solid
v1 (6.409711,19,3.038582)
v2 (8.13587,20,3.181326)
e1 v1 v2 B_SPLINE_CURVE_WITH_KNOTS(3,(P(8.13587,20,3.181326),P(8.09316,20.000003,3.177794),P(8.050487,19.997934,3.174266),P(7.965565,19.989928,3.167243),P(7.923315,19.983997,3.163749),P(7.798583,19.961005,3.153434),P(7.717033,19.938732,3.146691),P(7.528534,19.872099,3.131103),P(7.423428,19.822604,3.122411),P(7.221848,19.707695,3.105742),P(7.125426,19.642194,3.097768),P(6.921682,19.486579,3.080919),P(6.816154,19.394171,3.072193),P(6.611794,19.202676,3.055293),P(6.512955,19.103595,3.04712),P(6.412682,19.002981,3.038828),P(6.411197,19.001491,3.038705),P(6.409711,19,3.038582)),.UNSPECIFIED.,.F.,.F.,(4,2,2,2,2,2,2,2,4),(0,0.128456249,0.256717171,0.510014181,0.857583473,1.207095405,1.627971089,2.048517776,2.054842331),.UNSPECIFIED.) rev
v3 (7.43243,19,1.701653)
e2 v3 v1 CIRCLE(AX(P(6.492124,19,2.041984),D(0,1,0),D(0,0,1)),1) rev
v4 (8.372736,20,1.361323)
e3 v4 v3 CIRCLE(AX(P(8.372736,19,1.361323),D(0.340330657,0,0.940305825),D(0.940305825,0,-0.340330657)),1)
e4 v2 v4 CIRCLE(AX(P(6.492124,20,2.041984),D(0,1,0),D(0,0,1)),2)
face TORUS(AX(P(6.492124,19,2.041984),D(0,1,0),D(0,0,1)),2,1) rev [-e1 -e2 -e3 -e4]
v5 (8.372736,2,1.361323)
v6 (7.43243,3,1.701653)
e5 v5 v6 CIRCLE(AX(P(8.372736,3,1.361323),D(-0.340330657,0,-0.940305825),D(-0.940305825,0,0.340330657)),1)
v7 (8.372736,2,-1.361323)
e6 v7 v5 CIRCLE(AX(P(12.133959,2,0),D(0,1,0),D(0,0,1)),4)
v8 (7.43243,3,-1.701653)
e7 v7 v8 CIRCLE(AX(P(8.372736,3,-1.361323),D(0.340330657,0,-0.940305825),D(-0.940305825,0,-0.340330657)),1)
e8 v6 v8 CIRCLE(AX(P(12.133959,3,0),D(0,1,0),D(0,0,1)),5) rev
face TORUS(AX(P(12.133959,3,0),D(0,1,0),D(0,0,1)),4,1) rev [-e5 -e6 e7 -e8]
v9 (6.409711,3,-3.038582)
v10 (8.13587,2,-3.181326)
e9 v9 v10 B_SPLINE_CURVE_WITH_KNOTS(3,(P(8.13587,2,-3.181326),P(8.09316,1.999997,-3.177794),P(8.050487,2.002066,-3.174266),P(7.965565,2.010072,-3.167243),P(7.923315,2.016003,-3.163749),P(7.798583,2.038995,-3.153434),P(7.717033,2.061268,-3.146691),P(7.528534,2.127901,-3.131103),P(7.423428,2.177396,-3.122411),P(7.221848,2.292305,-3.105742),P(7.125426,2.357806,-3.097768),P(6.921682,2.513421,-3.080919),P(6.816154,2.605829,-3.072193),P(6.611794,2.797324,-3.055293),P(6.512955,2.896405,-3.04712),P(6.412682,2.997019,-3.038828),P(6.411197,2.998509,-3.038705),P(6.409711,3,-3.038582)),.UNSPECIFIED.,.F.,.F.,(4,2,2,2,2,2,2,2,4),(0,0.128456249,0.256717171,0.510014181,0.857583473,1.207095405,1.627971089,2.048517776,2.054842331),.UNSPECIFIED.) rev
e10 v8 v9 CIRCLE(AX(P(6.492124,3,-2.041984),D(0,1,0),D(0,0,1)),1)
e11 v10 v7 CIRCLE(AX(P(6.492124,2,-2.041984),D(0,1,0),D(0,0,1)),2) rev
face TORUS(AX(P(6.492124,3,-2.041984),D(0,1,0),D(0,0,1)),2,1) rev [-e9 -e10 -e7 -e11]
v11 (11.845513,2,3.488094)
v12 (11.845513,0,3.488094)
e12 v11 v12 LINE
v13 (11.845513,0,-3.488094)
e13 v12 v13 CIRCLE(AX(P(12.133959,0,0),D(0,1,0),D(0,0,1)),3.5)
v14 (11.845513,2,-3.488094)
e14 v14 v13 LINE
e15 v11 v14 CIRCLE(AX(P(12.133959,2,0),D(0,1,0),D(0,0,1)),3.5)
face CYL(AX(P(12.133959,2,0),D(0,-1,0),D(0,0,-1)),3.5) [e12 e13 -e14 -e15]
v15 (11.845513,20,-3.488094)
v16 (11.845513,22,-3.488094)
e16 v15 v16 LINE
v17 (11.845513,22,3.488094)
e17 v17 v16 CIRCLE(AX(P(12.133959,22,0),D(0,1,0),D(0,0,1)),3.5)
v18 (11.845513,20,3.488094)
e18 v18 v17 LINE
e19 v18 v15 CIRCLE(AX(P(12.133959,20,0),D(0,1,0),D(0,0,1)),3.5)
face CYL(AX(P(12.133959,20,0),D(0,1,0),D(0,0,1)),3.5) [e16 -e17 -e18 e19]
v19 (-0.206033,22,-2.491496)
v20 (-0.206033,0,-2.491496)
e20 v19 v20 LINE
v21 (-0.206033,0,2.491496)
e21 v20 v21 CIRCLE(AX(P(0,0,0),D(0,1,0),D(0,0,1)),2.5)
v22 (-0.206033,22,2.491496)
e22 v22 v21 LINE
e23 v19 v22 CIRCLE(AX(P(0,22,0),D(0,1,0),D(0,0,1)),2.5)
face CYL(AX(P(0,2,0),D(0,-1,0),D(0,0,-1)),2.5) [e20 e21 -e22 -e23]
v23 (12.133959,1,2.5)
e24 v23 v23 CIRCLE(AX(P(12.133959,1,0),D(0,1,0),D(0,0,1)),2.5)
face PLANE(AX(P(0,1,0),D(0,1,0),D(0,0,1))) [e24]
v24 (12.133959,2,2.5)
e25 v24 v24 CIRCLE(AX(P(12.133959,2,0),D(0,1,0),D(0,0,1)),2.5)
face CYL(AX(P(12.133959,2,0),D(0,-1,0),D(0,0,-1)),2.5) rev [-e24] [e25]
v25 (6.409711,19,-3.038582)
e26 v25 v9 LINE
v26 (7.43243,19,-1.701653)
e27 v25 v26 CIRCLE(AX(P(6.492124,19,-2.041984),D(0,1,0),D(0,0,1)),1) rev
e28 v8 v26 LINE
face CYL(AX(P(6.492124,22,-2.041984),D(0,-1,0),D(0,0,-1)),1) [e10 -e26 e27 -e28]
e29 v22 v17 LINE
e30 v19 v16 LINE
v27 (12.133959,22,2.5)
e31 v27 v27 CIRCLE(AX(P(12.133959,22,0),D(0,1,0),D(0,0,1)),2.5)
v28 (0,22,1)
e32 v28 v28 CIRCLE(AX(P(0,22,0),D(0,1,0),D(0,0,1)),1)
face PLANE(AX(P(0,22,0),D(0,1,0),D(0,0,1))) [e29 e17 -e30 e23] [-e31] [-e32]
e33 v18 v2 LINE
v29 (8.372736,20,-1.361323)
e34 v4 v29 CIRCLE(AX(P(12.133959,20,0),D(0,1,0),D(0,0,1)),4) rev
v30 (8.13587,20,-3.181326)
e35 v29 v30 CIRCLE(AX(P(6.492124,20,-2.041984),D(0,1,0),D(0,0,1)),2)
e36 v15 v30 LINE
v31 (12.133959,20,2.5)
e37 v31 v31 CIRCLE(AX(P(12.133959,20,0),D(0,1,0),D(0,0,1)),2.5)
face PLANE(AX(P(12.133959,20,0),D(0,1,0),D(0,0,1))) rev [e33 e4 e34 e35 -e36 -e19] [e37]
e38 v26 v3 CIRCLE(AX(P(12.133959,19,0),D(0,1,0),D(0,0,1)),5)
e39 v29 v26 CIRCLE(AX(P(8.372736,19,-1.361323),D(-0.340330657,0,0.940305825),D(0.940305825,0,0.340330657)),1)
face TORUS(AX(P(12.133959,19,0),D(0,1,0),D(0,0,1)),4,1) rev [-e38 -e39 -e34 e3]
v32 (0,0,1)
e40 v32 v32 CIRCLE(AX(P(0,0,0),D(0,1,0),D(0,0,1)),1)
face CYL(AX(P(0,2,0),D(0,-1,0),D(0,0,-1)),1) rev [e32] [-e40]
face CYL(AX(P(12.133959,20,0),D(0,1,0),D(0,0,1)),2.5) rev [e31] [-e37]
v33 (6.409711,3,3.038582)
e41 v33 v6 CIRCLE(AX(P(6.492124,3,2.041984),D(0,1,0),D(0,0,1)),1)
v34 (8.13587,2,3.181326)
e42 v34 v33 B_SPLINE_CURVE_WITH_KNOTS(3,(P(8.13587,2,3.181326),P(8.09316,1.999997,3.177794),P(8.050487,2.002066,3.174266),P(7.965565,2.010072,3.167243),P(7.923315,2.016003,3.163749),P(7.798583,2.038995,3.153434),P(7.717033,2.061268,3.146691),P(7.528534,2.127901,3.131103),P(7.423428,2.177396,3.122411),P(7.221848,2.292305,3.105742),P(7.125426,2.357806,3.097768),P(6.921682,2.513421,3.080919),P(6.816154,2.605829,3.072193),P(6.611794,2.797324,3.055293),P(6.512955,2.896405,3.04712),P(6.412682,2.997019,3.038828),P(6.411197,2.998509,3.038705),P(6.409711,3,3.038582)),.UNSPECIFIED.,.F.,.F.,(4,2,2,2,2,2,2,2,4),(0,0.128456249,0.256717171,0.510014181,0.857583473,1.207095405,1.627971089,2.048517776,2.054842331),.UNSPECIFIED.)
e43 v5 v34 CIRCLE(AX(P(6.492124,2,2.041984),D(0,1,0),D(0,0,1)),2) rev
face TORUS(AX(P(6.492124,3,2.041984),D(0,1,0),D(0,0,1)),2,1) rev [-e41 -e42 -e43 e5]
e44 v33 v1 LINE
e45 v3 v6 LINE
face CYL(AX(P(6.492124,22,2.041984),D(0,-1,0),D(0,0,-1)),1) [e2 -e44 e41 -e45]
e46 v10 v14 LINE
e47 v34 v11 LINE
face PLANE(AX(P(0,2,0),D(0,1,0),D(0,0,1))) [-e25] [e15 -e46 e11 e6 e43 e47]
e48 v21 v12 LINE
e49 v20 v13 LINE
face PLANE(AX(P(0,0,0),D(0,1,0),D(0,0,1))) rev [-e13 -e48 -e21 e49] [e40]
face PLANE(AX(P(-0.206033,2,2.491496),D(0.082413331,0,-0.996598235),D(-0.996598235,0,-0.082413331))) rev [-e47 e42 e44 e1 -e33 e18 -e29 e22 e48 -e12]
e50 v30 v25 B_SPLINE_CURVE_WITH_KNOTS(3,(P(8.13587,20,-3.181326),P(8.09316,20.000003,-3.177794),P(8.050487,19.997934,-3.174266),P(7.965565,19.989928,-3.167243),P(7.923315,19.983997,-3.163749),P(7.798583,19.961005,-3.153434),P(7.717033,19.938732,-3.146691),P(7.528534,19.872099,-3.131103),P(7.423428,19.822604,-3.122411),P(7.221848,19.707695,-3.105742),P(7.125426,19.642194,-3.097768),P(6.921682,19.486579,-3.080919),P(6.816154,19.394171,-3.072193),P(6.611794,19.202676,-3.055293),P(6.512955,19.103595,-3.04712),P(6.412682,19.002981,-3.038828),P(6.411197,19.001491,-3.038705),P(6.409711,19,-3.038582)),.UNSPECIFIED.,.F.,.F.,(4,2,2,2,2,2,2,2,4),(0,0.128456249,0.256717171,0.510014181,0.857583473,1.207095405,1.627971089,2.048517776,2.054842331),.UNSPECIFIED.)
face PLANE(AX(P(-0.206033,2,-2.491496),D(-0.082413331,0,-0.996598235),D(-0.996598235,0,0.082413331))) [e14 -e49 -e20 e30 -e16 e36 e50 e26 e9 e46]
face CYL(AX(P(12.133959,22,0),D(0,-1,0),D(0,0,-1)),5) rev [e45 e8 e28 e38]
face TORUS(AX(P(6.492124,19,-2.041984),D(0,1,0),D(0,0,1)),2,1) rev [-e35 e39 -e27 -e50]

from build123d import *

# Parameters (mm, degrees)
SKETCH1_R               = 1
SKETCH1_R_2             = 2.5
BOSS_EXTRUDE5_DEPTH     = 2
SKETCH1_7_R             = 2.5
SKETCH1_7_R_2           = 1
BOSS_EXTRUDE6_DEPTH     = 22
BOSS_EXTRUDE7_START     = 20
BOSS_EXTRUDE7_OUTLINE_R = 2.5
BOSS_EXTRUDE7_DEPTH     = 2
SKETCH1_9_R             = 2.5
BOSS_EXTRUDE8_DEPTH     = 1
FILLET3_R               = 1
FILLET1_R               = 1


# Read off the part's stored shape, not the designer's step: Boss-Extrude7
with BuildPart() as part:
    # Sketch1 → Boss-Extrude5 (new body)
    with BuildSketch(Plane(origin=(0, 0, 0), x_dir=(1, 0, 0), z_dir=(0, 1, 0))):
        with BuildLine():
            ThreePointArc((-0.206033327, 2.491495589), (-2.5, 0), (-0.206033327, -2.491495589))
            Line((-0.206033327, -2.491495589), (11.845512634, -3.488093824))
            ThreePointArc((11.845512634, -3.488093824), (15.633959292, 0), (11.845512634, 3.488093824))
            Line((11.845512634, 3.488093824), (-0.206033327, 2.491495589))
        make_face()
        with Locations(Location((0, 0, 0), (0, 0, 270))):
            Circle(SKETCH1_R, mode=Mode.SUBTRACT)
        with Locations(Location((12.133959292, 0, 0), (0, 0, 270))):
            Circle(SKETCH1_R_2, mode=Mode.SUBTRACT)
    extrude(amount=BOSS_EXTRUDE5_DEPTH)

    # Sketch1<7> → Boss-Extrude6 (add)
    # profile 1 of 2: a face of its own
    with BuildSketch(Plane(origin=(0, 0, 0), x_dir=(1, 0, 0), z_dir=(0, 1, 0))):
        Circle(SKETCH1_7_R)
        with Locations(Location((0, 0, 0), (0, 0, 270))):
            Circle(SKETCH1_7_R_2, mode=Mode.SUBTRACT)
    # profile 2 of 2: a face of its own
    with BuildSketch(Plane(origin=(0, 0, 0), x_dir=(1, 0, 0), z_dir=(0, 1, 0))):
        with BuildLine():
            Line((8.286945149, 3.193819373), (-0.206033327, 2.491495589))
            ThreePointArc((-0.206033327, 2.491495589), (1.693357122, 1.839168741), (2.5, 0))
            ThreePointArc((2.5, 0), (1.693357122, -1.839168741), (-0.206033327, -2.491495589))
            Line((-0.206033327, -2.491495589), (8.286945149, -3.193819373))
            ThreePointArc((8.286945149, -3.193819373), (7.133959292, 0), (8.286945149, 3.193819373))
        make_face()
    extrude(amount=BOSS_EXTRUDE6_DEPTH)

    # Boss-Extrude7 outline → Boss-Extrude7 (add)
    with BuildSketch(Plane(origin=(0, 0, 0), x_dir=(1, 0, 0), z_dir=(0, 1, 0)).offset(BOSS_EXTRUDE7_START)):
        with BuildLine():
            Line((8.286945149, -3.193819373), (11.845512634, -3.488093824))
            ThreePointArc((11.845512634, -3.488093824), (15.633959292, 0), (11.845512634, 3.488093824))
            Line((11.845512634, 3.488093824), (8.286945149, 3.193819373))
            ThreePointArc((8.286945149, 3.193819373), (7.133959292, 0), (8.286945149, -3.193819373))
        make_face()
        with Locations((12.133959292, 0)):
            Circle(BOSS_EXTRUDE7_OUTLINE_R, mode=Mode.SUBTRACT)
    extrude(amount=BOSS_EXTRUDE7_DEPTH)

    # Sketch1<9> → Boss-Extrude8 (add)
    with BuildSketch(Plane(origin=(0, 0, 0), x_dir=(1, 0, 0), z_dir=(0, 1, 0))):
        with Locations(Location((12.133959292, 0, 0), (0, 0, 270))):
            Circle(SKETCH1_9_R)
    extrude(amount=BOSS_EXTRUDE8_DEPTH)

    # Fillet3
    # the kernel refuses this fillet: 1 mm, written as the material it takes off along each edge
    with BuildSketch(Plane(origin=(8.286945149, 2, 3.193819373), x_dir=(-0.49694917619000334, 0, -0.8677796473091985), z_dir=(0, 1, 0))) as fillet3_piece_1:
        with BuildLine():
            CenterArc((1.891474067, 0.985105296), FILLET3_R, 145.474338823, 114.624318352)
            Line((1.067601639, 1.55188058), (0, 0))
            ThreePointArc((0, 0), (0.85976094, 0.074473518), (1.719521879, 0))
        make_face()
    extrude(amount=18, mode=Mode.SUBTRACT)
    with BuildSketch(Plane(origin=(8.286945149, 2, -3.193819373), x_dir=(-0.9965982354592262, 0, 0.08241333071510189), z_dir=(0, 1, 0))) as fillet3_piece_2:
        with BuildLine():
            CenterArc((1.883641843, 1), FILLET3_R, 155.375681648, 114.624318352)
            ThreePointArc((0.9745825, 1.416666667), (0.548647928, 0.666123584), (0, 0))
            Line((0, 0), (1.883641843, 0))
        make_face()
    extrude(amount=18, mode=Mode.SUBTRACT)

    # Fillet1
    # the kernel refuses this fillet: 1 mm, written as the material it adds along each edge
    with BuildSketch(Plane(origin=(12.133959294, 20, 0), x_dir=(-0.9403058248886403, 0, -0.34033065639241744), z_dir=(0.34033065639241744, 0, -0.9403058248886403))) as fillet1_piece_1:
        with BuildLine():
            CenterArc((5.000000002 - FILLET1_R, -FILLET1_R), FILLET1_R, 0, 90)
            Line((5.000000002 - FILLET1_R, 0), (5.000000002, 0))
            Line((5.000000002, 0), (5.000000002, -FILLET1_R))
        make_face()
    revolve(axis=Axis((12.133959294, 20, 0), (0, 1, 0)), revolution_arc=39.794041437)
    with BuildSketch(Plane(origin=(12.133959292, 2, 0), x_dir=(-0.9403058248462457, 0, 0.3403306565095503), z_dir=(0.3403306565095503, 0, 0.9403058248462457))) as fillet1_piece_2:
        with BuildLine():
            CenterArc((5 - FILLET1_R, -FILLET1_R), FILLET1_R, 0, 90)
            Line((5 - FILLET1_R, 0), (5, 0))
            Line((5, 0), (5, -FILLET1_R))
        make_face()
    revolve(axis=Axis((12.133959292, 2, 0), (0, -1, 0)), revolution_arc=39.794041451)
    with BuildSketch(Plane(origin=(6.492124343, 2, -2.041983939), x_dir=(0.9403058248461986, 0, 0.34033065650968036), z_dir=(-0.34033065650968036, 0, 0.9403058248461986))) as fillet1_piece_3_section:
        with BuildLine():
            CenterArc((1 + FILLET1_R, FILLET1_R), FILLET1_R, 180, 90)
            Line((1 + FILLET1_R, 0), (1, 0))
            Line((1, 0), (1, FILLET1_R))
        make_face()
    fillet1_piece_3 = revolve(axis=Axis((6.492124343, 2, -2.041983939), (0, 1, 0)), revolution_arc=257.957117876, mode=Mode.PRIVATE)
    fillet1_piece_3 = split(fillet1_piece_3, bisect_by=Plane(origin=(7.34883742, 2.262262875, -3.116242893), z_dir=(0.08241333071510651, 0, 0.9965982354592259)), keep=Keep.TOP, mode=Mode.PRIVATE)
    add(fillet1_piece_3)
    with BuildSketch(Plane(origin=(6.492124343, 20, -2.041983939), x_dir=(0.9403058248461986, 0, 0.34033065650968036), z_dir=(-0.34033065650968036, 0, 0.9403058248461986))) as fillet1_piece_4_section:
        with BuildLine():
            CenterArc((1 + FILLET1_R, -FILLET1_R), FILLET1_R, 90, 90)
            Line((1, -FILLET1_R), (1, 0))
            Line((1, 0), (1 + FILLET1_R, 0))
        make_face()
    fillet1_piece_4 = revolve(axis=Axis((6.492124343, 20, -2.041983939), (0, 1, 0)), revolution_arc=257.957117876, mode=Mode.PRIVATE)
    fillet1_piece_4 = split(fillet1_piece_4, bisect_by=Plane(origin=(7.693506276, 19.839747829, -3.14474516), z_dir=(0.08241333071510651, 0, 0.9965982354592259)), keep=Keep.TOP, mode=Mode.PRIVATE)
    add(fillet1_piece_4)
    with BuildSketch(Plane(origin=(6.492124343, 2, 2.041983939), x_dir=(-0.5290294610510079, 0, -0.8486034582418812), z_dir=(0.8486034582418812, 0, -0.5290294610510079))) as fillet1_piece_5_section:
        with BuildLine():
            CenterArc((1 + FILLET1_R, FILLET1_R), FILLET1_R, 180, 90)
            Line((1 + FILLET1_R, 0), (1, 0))
            Line((1, 0), (1, FILLET1_R))
        make_face()
    fillet1_piece_5 = revolve(axis=Axis((6.492124343, 2, 2.041983939), (0, 1, 0)), revolution_arc=257.957117876, mode=Mode.PRIVATE)
    fillet1_piece_5 = split(fillet1_piece_5, bisect_by=Plane(origin=(7.348749187, 2.26222623, 3.116235597), z_dir=(0.08241333071510651, 0, -0.9965982354592259)), keep=Keep.TOP, mode=Mode.PRIVATE)
    add(fillet1_piece_5)
    with BuildSketch(Plane(origin=(6.492124343, 20, 2.041983939), x_dir=(-0.5290294610510079, 0, -0.8486034582418812), z_dir=(0.8486034582418812, 0, -0.5290294610510079))) as fillet1_piece_6_section:
        with BuildLine():
            CenterArc((1 + FILLET1_R, -FILLET1_R), FILLET1_R, 90, 90)
            Line((1 + FILLET1_R, 0), (1, 0))
            Line((1, 0), (1, -FILLET1_R))
        make_face()
    fillet1_piece_6 = revolve(axis=Axis((6.492124343, 20, 2.041983939), (0, 1, 0)), revolution_arc=257.957117876, mode=Mode.PRIVATE)
    fillet1_piece_6 = split(fillet1_piece_6, bisect_by=Plane(origin=(7.34874918, 19.737773776, 3.116235596), z_dir=(0.08241333071510651, 0, -0.9965982354592259)), keep=Keep.TOP, mode=Mode.PRIVATE)
    add(fillet1_piece_6)


solid = part.part
